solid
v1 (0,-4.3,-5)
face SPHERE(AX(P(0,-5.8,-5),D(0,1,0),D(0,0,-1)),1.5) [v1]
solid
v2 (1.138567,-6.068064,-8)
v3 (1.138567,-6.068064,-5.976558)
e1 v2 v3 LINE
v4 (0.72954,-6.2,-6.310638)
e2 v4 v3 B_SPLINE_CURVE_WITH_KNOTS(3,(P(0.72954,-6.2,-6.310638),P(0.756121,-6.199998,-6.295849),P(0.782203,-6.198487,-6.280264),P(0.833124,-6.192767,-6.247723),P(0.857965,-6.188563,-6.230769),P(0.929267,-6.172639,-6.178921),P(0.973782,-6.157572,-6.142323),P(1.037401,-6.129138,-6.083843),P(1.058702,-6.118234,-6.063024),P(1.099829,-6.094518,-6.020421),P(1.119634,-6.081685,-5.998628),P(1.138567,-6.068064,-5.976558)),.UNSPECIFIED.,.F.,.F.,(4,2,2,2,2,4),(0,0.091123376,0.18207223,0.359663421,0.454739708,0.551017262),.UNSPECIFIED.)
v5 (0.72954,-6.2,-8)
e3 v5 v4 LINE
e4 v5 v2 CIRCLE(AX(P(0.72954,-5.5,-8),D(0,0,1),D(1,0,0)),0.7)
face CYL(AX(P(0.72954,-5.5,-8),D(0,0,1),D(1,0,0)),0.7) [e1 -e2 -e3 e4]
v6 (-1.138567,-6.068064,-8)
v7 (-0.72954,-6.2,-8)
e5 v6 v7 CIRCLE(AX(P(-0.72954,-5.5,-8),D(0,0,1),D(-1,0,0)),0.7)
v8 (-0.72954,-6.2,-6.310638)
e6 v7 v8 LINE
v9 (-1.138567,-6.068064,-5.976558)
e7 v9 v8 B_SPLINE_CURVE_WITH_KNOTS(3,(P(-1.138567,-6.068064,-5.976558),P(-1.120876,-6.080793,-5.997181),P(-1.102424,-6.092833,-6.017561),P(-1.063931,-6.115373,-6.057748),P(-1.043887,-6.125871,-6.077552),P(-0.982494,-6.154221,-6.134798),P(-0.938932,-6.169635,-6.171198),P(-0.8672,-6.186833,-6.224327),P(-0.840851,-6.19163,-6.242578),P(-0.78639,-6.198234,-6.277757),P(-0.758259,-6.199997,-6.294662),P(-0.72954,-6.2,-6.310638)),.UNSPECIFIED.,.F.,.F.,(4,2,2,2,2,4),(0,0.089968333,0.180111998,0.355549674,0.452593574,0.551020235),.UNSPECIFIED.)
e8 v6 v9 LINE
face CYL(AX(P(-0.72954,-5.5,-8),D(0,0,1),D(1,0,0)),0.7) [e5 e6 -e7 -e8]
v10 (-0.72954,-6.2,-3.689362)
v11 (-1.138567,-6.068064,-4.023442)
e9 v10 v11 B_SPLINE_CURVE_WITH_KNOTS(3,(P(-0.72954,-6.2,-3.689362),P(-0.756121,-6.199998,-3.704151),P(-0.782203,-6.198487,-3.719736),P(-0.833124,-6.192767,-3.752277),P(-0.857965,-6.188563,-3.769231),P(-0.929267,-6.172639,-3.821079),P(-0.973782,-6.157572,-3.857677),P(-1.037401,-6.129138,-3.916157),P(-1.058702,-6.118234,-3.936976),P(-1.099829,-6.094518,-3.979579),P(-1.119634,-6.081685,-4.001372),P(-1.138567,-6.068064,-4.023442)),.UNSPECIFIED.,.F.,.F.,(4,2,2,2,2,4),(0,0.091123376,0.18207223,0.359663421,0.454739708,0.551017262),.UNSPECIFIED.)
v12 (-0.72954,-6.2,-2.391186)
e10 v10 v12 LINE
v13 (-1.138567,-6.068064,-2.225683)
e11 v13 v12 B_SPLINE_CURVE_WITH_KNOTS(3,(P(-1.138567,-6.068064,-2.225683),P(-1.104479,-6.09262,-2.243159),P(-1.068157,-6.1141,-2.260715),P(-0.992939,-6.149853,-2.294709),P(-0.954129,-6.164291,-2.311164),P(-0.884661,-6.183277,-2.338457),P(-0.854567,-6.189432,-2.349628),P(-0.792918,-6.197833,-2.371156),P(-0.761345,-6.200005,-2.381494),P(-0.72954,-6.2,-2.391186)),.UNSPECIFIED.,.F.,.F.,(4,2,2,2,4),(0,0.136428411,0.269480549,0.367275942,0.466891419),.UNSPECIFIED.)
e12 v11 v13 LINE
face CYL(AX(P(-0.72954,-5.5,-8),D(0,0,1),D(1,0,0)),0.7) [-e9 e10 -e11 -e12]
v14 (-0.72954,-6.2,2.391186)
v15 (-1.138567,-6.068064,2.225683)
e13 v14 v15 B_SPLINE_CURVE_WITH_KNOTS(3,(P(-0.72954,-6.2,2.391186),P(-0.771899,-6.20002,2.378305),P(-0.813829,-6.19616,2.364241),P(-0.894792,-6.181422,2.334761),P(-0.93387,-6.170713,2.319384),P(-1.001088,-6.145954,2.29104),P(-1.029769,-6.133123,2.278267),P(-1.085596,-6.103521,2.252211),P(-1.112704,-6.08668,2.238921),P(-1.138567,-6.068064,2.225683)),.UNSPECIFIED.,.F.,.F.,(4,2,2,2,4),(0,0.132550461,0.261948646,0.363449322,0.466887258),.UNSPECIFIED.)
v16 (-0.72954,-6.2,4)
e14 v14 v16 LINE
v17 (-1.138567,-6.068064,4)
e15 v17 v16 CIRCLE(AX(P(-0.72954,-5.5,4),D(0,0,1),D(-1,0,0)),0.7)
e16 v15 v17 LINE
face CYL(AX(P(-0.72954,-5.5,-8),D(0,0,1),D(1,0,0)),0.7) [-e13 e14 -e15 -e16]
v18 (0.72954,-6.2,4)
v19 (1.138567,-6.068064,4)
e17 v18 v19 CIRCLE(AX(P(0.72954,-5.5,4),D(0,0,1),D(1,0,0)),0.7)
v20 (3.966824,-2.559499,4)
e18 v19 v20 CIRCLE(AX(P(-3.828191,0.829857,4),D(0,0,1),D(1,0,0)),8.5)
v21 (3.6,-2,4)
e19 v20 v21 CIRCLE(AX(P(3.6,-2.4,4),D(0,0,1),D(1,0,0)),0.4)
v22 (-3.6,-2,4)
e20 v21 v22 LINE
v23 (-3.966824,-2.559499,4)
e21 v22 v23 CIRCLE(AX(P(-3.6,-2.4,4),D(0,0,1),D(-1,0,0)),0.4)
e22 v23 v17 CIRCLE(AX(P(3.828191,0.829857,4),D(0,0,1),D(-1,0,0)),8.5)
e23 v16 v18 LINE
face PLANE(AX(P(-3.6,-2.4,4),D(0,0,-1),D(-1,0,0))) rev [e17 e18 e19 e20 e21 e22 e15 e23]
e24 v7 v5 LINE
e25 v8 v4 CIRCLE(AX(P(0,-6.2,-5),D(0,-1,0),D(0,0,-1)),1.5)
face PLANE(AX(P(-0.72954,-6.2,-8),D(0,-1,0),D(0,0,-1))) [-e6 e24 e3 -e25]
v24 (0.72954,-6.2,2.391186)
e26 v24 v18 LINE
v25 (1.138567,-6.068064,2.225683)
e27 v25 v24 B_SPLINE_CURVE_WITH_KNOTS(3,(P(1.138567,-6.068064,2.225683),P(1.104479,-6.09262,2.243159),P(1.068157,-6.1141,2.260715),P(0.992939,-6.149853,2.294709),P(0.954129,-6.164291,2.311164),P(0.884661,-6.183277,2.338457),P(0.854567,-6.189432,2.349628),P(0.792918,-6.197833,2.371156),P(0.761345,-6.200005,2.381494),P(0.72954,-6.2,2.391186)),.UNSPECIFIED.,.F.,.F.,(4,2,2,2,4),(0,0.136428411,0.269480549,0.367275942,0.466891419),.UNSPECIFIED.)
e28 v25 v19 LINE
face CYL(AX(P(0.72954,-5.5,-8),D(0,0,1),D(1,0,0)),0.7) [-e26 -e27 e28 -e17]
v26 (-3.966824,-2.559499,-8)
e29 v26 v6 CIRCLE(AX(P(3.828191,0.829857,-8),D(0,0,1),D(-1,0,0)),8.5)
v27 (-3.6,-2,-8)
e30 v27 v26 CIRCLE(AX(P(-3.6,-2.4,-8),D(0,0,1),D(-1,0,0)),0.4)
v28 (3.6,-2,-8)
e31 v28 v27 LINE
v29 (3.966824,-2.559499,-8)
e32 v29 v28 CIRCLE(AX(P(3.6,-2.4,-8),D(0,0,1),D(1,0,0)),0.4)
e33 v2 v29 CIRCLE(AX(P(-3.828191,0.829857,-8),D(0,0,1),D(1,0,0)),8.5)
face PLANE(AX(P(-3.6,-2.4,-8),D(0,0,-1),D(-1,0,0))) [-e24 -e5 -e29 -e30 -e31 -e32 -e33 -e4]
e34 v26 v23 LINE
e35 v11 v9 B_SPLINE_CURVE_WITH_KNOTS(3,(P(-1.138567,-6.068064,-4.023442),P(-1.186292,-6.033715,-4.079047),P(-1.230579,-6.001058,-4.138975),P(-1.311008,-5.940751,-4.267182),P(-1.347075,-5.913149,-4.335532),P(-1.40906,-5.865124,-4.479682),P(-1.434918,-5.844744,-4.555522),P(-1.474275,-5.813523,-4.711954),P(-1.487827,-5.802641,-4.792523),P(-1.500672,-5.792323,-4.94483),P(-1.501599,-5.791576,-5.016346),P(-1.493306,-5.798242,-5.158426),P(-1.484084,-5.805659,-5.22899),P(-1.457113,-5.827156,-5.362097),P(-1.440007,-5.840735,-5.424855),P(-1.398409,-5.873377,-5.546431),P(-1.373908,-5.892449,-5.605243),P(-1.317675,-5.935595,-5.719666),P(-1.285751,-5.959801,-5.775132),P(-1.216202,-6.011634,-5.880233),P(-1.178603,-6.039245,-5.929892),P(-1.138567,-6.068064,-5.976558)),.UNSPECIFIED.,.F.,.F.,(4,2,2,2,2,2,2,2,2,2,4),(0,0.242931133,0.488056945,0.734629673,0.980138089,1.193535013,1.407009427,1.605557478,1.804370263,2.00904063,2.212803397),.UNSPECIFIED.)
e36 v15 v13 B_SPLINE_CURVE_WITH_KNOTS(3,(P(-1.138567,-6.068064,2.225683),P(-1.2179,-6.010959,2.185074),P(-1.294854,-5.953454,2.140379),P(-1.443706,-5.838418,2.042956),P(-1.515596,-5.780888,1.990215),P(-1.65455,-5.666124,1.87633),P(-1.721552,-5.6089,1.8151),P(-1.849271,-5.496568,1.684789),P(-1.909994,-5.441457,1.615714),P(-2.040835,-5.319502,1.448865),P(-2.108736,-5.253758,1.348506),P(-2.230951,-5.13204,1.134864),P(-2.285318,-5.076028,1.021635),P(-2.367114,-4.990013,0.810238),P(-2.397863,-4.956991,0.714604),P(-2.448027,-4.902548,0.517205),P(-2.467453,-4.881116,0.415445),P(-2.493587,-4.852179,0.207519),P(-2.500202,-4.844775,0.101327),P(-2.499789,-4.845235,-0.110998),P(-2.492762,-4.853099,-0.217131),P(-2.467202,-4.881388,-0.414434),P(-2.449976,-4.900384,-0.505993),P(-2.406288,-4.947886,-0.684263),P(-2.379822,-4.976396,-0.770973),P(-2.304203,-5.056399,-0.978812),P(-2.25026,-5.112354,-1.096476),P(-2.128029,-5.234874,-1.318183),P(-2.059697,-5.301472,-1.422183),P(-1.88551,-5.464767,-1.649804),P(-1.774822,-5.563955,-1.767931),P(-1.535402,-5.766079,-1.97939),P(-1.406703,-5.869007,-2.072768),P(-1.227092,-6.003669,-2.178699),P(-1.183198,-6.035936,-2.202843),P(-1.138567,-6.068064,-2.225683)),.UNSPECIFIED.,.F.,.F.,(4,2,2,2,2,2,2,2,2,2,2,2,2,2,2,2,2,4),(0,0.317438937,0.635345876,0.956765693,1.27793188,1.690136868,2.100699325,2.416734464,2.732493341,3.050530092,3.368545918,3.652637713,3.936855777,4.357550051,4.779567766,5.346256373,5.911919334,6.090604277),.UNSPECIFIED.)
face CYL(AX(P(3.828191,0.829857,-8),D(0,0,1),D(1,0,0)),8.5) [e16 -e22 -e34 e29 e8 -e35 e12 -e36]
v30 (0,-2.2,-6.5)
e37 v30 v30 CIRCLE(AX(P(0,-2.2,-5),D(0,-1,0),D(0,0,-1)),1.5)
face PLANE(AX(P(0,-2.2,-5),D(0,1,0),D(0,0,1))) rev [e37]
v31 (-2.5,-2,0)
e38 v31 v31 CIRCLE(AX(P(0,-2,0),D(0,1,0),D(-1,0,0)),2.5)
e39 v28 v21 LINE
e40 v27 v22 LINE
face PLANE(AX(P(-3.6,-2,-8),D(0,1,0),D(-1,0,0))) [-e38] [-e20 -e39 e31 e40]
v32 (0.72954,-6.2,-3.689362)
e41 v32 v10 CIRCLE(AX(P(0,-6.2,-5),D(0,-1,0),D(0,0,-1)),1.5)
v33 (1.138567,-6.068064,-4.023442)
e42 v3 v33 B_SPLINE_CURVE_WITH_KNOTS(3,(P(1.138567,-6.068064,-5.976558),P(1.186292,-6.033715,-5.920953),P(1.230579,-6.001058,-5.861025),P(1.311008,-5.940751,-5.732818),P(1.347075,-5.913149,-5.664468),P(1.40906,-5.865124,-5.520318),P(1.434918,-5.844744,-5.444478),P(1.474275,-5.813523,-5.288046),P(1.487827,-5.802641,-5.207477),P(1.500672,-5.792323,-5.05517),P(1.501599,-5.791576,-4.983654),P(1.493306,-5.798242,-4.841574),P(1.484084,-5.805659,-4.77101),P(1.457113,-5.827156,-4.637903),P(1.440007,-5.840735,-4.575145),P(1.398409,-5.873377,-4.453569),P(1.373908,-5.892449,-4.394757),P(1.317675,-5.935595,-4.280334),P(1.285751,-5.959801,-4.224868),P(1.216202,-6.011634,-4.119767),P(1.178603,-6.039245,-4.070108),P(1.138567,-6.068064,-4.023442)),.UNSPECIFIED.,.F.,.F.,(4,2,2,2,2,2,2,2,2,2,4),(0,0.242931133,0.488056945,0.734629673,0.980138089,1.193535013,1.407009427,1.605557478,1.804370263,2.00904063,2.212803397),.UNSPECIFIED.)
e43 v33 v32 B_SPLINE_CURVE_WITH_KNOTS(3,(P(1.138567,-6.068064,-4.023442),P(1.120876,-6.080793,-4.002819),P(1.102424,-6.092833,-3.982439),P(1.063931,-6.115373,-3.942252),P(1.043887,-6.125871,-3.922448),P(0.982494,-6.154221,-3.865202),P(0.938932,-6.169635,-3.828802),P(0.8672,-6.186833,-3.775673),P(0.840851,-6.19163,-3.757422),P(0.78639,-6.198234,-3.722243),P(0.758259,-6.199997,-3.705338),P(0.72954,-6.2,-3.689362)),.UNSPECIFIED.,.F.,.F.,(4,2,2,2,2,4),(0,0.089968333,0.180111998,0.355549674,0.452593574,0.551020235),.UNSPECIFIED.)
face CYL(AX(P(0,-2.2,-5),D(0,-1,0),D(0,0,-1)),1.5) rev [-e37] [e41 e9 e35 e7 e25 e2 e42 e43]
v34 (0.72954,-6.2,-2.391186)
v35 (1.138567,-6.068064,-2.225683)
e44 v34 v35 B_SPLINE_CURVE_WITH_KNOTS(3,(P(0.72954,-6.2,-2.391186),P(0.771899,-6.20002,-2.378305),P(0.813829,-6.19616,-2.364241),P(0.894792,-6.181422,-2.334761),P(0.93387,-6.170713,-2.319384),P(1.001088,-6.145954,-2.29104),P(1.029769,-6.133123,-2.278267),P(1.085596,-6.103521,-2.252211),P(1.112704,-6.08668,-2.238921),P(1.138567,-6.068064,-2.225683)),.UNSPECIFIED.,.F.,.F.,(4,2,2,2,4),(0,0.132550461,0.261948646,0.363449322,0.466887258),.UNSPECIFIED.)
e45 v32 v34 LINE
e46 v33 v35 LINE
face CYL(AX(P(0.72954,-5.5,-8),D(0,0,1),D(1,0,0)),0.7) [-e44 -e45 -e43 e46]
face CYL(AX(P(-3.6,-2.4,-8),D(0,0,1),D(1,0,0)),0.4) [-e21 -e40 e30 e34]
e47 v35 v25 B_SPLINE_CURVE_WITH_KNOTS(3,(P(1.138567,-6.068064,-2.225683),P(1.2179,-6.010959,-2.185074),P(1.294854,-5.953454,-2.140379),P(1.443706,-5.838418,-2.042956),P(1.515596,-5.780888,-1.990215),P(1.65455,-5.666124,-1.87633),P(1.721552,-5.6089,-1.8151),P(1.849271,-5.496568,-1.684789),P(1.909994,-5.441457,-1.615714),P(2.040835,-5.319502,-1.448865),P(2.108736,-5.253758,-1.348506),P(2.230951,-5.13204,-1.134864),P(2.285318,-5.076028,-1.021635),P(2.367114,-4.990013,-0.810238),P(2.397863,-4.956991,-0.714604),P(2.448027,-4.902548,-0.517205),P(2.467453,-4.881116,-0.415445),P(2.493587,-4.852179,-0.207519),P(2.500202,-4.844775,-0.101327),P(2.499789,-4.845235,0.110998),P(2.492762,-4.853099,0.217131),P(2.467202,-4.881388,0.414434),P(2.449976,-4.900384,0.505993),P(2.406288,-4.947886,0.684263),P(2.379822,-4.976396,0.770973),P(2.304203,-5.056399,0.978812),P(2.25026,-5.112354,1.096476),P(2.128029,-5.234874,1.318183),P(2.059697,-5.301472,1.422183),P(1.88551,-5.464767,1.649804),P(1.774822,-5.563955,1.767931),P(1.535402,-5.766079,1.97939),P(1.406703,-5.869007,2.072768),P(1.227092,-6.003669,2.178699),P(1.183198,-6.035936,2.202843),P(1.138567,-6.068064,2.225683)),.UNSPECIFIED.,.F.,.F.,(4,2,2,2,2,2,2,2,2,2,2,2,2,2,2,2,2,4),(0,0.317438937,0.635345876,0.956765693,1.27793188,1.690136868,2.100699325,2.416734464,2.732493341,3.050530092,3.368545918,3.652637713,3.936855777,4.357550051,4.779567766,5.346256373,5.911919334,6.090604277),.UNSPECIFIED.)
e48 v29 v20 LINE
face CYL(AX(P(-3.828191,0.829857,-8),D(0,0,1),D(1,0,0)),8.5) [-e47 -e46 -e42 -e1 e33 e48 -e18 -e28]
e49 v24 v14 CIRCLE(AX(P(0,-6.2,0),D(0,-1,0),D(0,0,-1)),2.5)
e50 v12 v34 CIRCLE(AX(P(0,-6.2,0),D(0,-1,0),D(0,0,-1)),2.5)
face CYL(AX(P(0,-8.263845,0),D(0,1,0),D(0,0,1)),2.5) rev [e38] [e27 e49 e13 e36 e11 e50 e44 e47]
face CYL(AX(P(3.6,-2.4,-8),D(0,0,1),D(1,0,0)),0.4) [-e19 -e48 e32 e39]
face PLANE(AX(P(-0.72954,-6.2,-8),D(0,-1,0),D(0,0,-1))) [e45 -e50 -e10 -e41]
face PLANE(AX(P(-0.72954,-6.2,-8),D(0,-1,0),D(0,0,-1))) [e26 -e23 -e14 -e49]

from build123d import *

# Parameters (mm, degrees)
SKETCH1_R              = 2.5
BOSS_EXTRUDE1_DEPTH    = 8
CUT_SWEEP1_PITCH       = 0.7999999999999955
CUT_SWEEP1_HEIGHT      = 8.799999999999976
CUT_SWEEP1_RADIUS      = 2.5000000000000004
CUT_SWEEP1_START_ANGLE = -179.99999999999997
SKETCH4_OUTSIDE_W      = 10.736
SKETCH4_OUTSIDE_H      = 10.736
SKETCH4_OUTSIDE_R      = 1.8937822173508914
CUT_EXTRUDE1_DEPTH     = 0.8
CUT_EXTRUDE1_DRAFT     = -45.0000000000001
CUT_EXTRUDE2_DEPTH     = 1.8
BOSS_EXTRUDE2_START    = 4
BOSS_EXTRUDE2_DEPTH    = 12
SKETCH9_R              = 2.5
CUT_EXTRUDE4_DEPTH     = 13.270391295716696
SKETCH10_W             = 1.5
SKETCH10_H             = 3.9999999999999996


with BuildPart() as part:
    # Sketch1 → Boss-Extrude1 (new body)
    with BuildSketch(Plane(origin=(0, 0, 0), x_dir=(1, 0, 0), z_dir=(0, 1, 0))):
        with Locations(Location((0, 0, 0), (0, 0, 270))):
            Circle(SKETCH1_R)
    extrude(amount=-BOSS_EXTRUDE1_DEPTH)

    # Cut-Sweep1: sweep along a helix
    with BuildLine() as cut_sweep1_path:
        add(Helix(CUT_SWEEP1_PITCH, CUT_SWEEP1_HEIGHT, CUT_SWEEP1_RADIUS, center=(0, -8.000000000000002, 0), direction=(0, 1, 0), mode=Mode.PRIVATE).rotate(Axis((0, -8.000000000000002, 0), (0, 1, 0)), CUT_SWEEP1_START_ANGLE))
    # Sketch3 → Cut-Sweep1 (sweep, cut)
    with BuildSketch(Plane(origin=(0, 0, 0), x_dir=(0, 0, -1), z_dir=(1, 0, 0))):
        Polygon((1.9803847577293245, -8.300000000000004), (2.543301270189217, -7.975000000000005), (2.543301270189217, -8.725000000000001), (1.9803847577293245, -8.400000000000002), align=None)
    sweep(path=cut_sweep1_path.line, is_frenet=True, mode=Mode.SUBTRACT)


with BuildPart() as cut_extrude1_tool:
    # Sketch4 outside → Cut-Extrude1 (with draft: the straight prism first)
    with BuildSketch(Plane.XZ.offset(8)):
        Rectangle(SKETCH4_OUTSIDE_W, SKETCH4_OUTSIDE_H)
        Circle(SKETCH4_OUTSIDE_R, mode=Mode.SUBTRACT)
    extrude(amount=-CUT_EXTRUDE1_DEPTH)
    # Cut-Extrude1: the draft: its side faces are tilted about the plane it starts from
    cut_extrude1_sides = [cut_extrude1_tool.faces().sort_by_distance(p)[0] for p in [
        (0, -7.6, -5.368),
        (5.368, -7.6, 0),
        (0, -7.6, 5.368),
        (-5.368, -7.6, 0),
        (-1.893782217, -7.6, 0),
    ]]
    draft(cut_extrude1_sides, Plane.XZ.offset(8), CUT_EXTRUDE1_DRAFT)


with BuildPart() as part_1:
    add(part.part)

    # Cut-Extrude1: cut by cut_extrude1_tool
    add(cut_extrude1_tool.part, mode=Mode.SUBTRACT)

    # Sketch5 → Revolve1 (revolve)
    with BuildSketch(Plane.XY, mode=Mode.PRIVATE) as revolve1_sk:
        with BuildLine():
            Line((6e-17, 2.8), (0, 0))
            Line((0, 0), (-4.75, -5.6e-16))
            Line((-4.75, -5.6e-16), (-4.75, 0.6999999999999993))
            ThreePointArc((-4.75, 0.6999999999999993), (-3.774006491780319, 1.9096498126217711), (-2.5, 2.7999999999999994))
            Line((-2.5, 2.7999999999999994), (6e-17, 2.8))
        make_face()
    revolve(revolve1_sk.sketch.rotate(Axis((0, 0, 0), (1.2e-16, -1, 0)), 90), axis=Axis((0, 0, 0), (1.2e-16, -1, 0)))

    # Sketch6 → Cut-Extrude2 (cut)
    with BuildSketch(Plane(origin=(-3.5e-16, 2.8000000000000003, 0), x_dir=(1, 1.2e-16, 0), z_dir=(-1.2e-16, 1, 0))):
        Polygon((0, 1.7320508075688774), (-1.5000000000000004, 0.8660254037844389), (-1.5000000000000002, -0.866025403784439), (3e-17, -1.7320508075688779), (1.5, -0.8660254037844396), (1.4999999999999998, 0.8660254037844392), align=None)
    extrude(amount=-CUT_EXTRUDE2_DEPTH, mode=Mode.SUBTRACT)

    # Cut-Extrude3 cone 1 section (through the dimple's axis) → Cut-Extrude3 (revolve, cut)
    with BuildSketch(Plane(origin=(0, 2.8, 0), x_dir=(0, 0, 1), z_dir=(1, 0, 0))):
        Polygon((0, 0), (1.732050808, 0), (0, 1.732050808), align=None)
    revolve(axis=Axis((0, 2.8, 0), (0, -1, 0)), mode=Mode.SUBTRACT)


with BuildPart() as body_2:
    # Sketch8 → Boss-Extrude2 (new body)
    with BuildSketch(Plane.XY.offset(BOSS_EXTRUDE2_START)):
        with BuildLine():
            Line((-0.729539694732655, -6.200000000000001), (0.7295396947326566, -6.200000000000001))
            ThreePointArc((0.7295396947326566, -6.200000000000001), (0.9444293615952137, -6.166199993302087), (1.1385668222312952, -6.068064088787715))
            ThreePointArc((1.1385668222312952, -6.068064088787715), (2.7894535956378506, -4.5046324857998545), (3.9668242545450783, -2.559499110585124))
            ThreePointArc((3.9668242545450783, -2.559499110585124), (3.934514307791197, -2.180682472467487), (3.6, -1.9999999999999996))
            Line((3.6, -1.9999999999999996), (-3.599999999999999, -2.0000000000000004))
            ThreePointArc((-3.599999999999999, -2.0000000000000004), (-3.934514307791197, -2.1806824724674874), (-3.9668242545450783, -2.559499110585125))
            ThreePointArc((-3.9668242545450783, -2.559499110585125), (-2.789453595637847, -4.504632485799857), (-1.1385668222312935, -6.068064088787715))
            ThreePointArc((-1.1385668222312935, -6.068064088787715), (-0.9444293615952122, -6.166199993302087), (-0.729539694732655, -6.200000000000001))
        make_face()
    extrude(amount=-BOSS_EXTRUDE2_DEPTH)

    # Sketch9 → Cut-Extrude4 (cut, through all)
    with BuildSketch(Plane(origin=(0, 0, 0), x_dir=(1, 0, 0), z_dir=(0, 1, 0))):
        with Locations(Location((0, 0, 0), (0, 0, 253.033298699))):
            Circle(SKETCH9_R)
    extrude(amount=-CUT_EXTRUDE4_DEPTH, mode=Mode.SUBTRACT)

    # Sketch10 → Cut-Revolve1 (revolve, cut)
    with BuildSketch(Plane(origin=(0, 0, 0), x_dir=(0, 0, -1), z_dir=(1, 0, 0))):
        with Locations((5.750000000000001, -4.2)):
            Rectangle(SKETCH10_W, SKETCH10_H)
    revolve(axis=Axis((0, -2.2000000000000006, -5.000000000000001), (0, 1, 0)), mode=Mode.SUBTRACT)


with BuildPart() as body_3:
    # Sketch11 → Revolve2 (revolve)
    with BuildSketch(Plane(origin=(0, 0, 0), x_dir=(0, 0, -1), z_dir=(1, 0, 0))):
        with BuildLine():
            Line((5.000000000000001, -4.300000000000002), (5.000000000000001, -7.300000000000001))
            ThreePointArc((5.000000000000001, -7.300000000000001), (6.500000000000001, -5.800000000000001), (5.000000000000001, -4.300000000000002))
        make_face()
    revolve(axis=Axis((0, -4.300000000000002, -5.000000000000001), (0, -1, 0)))


solid = Compound([body_2.part, body_3.part])
